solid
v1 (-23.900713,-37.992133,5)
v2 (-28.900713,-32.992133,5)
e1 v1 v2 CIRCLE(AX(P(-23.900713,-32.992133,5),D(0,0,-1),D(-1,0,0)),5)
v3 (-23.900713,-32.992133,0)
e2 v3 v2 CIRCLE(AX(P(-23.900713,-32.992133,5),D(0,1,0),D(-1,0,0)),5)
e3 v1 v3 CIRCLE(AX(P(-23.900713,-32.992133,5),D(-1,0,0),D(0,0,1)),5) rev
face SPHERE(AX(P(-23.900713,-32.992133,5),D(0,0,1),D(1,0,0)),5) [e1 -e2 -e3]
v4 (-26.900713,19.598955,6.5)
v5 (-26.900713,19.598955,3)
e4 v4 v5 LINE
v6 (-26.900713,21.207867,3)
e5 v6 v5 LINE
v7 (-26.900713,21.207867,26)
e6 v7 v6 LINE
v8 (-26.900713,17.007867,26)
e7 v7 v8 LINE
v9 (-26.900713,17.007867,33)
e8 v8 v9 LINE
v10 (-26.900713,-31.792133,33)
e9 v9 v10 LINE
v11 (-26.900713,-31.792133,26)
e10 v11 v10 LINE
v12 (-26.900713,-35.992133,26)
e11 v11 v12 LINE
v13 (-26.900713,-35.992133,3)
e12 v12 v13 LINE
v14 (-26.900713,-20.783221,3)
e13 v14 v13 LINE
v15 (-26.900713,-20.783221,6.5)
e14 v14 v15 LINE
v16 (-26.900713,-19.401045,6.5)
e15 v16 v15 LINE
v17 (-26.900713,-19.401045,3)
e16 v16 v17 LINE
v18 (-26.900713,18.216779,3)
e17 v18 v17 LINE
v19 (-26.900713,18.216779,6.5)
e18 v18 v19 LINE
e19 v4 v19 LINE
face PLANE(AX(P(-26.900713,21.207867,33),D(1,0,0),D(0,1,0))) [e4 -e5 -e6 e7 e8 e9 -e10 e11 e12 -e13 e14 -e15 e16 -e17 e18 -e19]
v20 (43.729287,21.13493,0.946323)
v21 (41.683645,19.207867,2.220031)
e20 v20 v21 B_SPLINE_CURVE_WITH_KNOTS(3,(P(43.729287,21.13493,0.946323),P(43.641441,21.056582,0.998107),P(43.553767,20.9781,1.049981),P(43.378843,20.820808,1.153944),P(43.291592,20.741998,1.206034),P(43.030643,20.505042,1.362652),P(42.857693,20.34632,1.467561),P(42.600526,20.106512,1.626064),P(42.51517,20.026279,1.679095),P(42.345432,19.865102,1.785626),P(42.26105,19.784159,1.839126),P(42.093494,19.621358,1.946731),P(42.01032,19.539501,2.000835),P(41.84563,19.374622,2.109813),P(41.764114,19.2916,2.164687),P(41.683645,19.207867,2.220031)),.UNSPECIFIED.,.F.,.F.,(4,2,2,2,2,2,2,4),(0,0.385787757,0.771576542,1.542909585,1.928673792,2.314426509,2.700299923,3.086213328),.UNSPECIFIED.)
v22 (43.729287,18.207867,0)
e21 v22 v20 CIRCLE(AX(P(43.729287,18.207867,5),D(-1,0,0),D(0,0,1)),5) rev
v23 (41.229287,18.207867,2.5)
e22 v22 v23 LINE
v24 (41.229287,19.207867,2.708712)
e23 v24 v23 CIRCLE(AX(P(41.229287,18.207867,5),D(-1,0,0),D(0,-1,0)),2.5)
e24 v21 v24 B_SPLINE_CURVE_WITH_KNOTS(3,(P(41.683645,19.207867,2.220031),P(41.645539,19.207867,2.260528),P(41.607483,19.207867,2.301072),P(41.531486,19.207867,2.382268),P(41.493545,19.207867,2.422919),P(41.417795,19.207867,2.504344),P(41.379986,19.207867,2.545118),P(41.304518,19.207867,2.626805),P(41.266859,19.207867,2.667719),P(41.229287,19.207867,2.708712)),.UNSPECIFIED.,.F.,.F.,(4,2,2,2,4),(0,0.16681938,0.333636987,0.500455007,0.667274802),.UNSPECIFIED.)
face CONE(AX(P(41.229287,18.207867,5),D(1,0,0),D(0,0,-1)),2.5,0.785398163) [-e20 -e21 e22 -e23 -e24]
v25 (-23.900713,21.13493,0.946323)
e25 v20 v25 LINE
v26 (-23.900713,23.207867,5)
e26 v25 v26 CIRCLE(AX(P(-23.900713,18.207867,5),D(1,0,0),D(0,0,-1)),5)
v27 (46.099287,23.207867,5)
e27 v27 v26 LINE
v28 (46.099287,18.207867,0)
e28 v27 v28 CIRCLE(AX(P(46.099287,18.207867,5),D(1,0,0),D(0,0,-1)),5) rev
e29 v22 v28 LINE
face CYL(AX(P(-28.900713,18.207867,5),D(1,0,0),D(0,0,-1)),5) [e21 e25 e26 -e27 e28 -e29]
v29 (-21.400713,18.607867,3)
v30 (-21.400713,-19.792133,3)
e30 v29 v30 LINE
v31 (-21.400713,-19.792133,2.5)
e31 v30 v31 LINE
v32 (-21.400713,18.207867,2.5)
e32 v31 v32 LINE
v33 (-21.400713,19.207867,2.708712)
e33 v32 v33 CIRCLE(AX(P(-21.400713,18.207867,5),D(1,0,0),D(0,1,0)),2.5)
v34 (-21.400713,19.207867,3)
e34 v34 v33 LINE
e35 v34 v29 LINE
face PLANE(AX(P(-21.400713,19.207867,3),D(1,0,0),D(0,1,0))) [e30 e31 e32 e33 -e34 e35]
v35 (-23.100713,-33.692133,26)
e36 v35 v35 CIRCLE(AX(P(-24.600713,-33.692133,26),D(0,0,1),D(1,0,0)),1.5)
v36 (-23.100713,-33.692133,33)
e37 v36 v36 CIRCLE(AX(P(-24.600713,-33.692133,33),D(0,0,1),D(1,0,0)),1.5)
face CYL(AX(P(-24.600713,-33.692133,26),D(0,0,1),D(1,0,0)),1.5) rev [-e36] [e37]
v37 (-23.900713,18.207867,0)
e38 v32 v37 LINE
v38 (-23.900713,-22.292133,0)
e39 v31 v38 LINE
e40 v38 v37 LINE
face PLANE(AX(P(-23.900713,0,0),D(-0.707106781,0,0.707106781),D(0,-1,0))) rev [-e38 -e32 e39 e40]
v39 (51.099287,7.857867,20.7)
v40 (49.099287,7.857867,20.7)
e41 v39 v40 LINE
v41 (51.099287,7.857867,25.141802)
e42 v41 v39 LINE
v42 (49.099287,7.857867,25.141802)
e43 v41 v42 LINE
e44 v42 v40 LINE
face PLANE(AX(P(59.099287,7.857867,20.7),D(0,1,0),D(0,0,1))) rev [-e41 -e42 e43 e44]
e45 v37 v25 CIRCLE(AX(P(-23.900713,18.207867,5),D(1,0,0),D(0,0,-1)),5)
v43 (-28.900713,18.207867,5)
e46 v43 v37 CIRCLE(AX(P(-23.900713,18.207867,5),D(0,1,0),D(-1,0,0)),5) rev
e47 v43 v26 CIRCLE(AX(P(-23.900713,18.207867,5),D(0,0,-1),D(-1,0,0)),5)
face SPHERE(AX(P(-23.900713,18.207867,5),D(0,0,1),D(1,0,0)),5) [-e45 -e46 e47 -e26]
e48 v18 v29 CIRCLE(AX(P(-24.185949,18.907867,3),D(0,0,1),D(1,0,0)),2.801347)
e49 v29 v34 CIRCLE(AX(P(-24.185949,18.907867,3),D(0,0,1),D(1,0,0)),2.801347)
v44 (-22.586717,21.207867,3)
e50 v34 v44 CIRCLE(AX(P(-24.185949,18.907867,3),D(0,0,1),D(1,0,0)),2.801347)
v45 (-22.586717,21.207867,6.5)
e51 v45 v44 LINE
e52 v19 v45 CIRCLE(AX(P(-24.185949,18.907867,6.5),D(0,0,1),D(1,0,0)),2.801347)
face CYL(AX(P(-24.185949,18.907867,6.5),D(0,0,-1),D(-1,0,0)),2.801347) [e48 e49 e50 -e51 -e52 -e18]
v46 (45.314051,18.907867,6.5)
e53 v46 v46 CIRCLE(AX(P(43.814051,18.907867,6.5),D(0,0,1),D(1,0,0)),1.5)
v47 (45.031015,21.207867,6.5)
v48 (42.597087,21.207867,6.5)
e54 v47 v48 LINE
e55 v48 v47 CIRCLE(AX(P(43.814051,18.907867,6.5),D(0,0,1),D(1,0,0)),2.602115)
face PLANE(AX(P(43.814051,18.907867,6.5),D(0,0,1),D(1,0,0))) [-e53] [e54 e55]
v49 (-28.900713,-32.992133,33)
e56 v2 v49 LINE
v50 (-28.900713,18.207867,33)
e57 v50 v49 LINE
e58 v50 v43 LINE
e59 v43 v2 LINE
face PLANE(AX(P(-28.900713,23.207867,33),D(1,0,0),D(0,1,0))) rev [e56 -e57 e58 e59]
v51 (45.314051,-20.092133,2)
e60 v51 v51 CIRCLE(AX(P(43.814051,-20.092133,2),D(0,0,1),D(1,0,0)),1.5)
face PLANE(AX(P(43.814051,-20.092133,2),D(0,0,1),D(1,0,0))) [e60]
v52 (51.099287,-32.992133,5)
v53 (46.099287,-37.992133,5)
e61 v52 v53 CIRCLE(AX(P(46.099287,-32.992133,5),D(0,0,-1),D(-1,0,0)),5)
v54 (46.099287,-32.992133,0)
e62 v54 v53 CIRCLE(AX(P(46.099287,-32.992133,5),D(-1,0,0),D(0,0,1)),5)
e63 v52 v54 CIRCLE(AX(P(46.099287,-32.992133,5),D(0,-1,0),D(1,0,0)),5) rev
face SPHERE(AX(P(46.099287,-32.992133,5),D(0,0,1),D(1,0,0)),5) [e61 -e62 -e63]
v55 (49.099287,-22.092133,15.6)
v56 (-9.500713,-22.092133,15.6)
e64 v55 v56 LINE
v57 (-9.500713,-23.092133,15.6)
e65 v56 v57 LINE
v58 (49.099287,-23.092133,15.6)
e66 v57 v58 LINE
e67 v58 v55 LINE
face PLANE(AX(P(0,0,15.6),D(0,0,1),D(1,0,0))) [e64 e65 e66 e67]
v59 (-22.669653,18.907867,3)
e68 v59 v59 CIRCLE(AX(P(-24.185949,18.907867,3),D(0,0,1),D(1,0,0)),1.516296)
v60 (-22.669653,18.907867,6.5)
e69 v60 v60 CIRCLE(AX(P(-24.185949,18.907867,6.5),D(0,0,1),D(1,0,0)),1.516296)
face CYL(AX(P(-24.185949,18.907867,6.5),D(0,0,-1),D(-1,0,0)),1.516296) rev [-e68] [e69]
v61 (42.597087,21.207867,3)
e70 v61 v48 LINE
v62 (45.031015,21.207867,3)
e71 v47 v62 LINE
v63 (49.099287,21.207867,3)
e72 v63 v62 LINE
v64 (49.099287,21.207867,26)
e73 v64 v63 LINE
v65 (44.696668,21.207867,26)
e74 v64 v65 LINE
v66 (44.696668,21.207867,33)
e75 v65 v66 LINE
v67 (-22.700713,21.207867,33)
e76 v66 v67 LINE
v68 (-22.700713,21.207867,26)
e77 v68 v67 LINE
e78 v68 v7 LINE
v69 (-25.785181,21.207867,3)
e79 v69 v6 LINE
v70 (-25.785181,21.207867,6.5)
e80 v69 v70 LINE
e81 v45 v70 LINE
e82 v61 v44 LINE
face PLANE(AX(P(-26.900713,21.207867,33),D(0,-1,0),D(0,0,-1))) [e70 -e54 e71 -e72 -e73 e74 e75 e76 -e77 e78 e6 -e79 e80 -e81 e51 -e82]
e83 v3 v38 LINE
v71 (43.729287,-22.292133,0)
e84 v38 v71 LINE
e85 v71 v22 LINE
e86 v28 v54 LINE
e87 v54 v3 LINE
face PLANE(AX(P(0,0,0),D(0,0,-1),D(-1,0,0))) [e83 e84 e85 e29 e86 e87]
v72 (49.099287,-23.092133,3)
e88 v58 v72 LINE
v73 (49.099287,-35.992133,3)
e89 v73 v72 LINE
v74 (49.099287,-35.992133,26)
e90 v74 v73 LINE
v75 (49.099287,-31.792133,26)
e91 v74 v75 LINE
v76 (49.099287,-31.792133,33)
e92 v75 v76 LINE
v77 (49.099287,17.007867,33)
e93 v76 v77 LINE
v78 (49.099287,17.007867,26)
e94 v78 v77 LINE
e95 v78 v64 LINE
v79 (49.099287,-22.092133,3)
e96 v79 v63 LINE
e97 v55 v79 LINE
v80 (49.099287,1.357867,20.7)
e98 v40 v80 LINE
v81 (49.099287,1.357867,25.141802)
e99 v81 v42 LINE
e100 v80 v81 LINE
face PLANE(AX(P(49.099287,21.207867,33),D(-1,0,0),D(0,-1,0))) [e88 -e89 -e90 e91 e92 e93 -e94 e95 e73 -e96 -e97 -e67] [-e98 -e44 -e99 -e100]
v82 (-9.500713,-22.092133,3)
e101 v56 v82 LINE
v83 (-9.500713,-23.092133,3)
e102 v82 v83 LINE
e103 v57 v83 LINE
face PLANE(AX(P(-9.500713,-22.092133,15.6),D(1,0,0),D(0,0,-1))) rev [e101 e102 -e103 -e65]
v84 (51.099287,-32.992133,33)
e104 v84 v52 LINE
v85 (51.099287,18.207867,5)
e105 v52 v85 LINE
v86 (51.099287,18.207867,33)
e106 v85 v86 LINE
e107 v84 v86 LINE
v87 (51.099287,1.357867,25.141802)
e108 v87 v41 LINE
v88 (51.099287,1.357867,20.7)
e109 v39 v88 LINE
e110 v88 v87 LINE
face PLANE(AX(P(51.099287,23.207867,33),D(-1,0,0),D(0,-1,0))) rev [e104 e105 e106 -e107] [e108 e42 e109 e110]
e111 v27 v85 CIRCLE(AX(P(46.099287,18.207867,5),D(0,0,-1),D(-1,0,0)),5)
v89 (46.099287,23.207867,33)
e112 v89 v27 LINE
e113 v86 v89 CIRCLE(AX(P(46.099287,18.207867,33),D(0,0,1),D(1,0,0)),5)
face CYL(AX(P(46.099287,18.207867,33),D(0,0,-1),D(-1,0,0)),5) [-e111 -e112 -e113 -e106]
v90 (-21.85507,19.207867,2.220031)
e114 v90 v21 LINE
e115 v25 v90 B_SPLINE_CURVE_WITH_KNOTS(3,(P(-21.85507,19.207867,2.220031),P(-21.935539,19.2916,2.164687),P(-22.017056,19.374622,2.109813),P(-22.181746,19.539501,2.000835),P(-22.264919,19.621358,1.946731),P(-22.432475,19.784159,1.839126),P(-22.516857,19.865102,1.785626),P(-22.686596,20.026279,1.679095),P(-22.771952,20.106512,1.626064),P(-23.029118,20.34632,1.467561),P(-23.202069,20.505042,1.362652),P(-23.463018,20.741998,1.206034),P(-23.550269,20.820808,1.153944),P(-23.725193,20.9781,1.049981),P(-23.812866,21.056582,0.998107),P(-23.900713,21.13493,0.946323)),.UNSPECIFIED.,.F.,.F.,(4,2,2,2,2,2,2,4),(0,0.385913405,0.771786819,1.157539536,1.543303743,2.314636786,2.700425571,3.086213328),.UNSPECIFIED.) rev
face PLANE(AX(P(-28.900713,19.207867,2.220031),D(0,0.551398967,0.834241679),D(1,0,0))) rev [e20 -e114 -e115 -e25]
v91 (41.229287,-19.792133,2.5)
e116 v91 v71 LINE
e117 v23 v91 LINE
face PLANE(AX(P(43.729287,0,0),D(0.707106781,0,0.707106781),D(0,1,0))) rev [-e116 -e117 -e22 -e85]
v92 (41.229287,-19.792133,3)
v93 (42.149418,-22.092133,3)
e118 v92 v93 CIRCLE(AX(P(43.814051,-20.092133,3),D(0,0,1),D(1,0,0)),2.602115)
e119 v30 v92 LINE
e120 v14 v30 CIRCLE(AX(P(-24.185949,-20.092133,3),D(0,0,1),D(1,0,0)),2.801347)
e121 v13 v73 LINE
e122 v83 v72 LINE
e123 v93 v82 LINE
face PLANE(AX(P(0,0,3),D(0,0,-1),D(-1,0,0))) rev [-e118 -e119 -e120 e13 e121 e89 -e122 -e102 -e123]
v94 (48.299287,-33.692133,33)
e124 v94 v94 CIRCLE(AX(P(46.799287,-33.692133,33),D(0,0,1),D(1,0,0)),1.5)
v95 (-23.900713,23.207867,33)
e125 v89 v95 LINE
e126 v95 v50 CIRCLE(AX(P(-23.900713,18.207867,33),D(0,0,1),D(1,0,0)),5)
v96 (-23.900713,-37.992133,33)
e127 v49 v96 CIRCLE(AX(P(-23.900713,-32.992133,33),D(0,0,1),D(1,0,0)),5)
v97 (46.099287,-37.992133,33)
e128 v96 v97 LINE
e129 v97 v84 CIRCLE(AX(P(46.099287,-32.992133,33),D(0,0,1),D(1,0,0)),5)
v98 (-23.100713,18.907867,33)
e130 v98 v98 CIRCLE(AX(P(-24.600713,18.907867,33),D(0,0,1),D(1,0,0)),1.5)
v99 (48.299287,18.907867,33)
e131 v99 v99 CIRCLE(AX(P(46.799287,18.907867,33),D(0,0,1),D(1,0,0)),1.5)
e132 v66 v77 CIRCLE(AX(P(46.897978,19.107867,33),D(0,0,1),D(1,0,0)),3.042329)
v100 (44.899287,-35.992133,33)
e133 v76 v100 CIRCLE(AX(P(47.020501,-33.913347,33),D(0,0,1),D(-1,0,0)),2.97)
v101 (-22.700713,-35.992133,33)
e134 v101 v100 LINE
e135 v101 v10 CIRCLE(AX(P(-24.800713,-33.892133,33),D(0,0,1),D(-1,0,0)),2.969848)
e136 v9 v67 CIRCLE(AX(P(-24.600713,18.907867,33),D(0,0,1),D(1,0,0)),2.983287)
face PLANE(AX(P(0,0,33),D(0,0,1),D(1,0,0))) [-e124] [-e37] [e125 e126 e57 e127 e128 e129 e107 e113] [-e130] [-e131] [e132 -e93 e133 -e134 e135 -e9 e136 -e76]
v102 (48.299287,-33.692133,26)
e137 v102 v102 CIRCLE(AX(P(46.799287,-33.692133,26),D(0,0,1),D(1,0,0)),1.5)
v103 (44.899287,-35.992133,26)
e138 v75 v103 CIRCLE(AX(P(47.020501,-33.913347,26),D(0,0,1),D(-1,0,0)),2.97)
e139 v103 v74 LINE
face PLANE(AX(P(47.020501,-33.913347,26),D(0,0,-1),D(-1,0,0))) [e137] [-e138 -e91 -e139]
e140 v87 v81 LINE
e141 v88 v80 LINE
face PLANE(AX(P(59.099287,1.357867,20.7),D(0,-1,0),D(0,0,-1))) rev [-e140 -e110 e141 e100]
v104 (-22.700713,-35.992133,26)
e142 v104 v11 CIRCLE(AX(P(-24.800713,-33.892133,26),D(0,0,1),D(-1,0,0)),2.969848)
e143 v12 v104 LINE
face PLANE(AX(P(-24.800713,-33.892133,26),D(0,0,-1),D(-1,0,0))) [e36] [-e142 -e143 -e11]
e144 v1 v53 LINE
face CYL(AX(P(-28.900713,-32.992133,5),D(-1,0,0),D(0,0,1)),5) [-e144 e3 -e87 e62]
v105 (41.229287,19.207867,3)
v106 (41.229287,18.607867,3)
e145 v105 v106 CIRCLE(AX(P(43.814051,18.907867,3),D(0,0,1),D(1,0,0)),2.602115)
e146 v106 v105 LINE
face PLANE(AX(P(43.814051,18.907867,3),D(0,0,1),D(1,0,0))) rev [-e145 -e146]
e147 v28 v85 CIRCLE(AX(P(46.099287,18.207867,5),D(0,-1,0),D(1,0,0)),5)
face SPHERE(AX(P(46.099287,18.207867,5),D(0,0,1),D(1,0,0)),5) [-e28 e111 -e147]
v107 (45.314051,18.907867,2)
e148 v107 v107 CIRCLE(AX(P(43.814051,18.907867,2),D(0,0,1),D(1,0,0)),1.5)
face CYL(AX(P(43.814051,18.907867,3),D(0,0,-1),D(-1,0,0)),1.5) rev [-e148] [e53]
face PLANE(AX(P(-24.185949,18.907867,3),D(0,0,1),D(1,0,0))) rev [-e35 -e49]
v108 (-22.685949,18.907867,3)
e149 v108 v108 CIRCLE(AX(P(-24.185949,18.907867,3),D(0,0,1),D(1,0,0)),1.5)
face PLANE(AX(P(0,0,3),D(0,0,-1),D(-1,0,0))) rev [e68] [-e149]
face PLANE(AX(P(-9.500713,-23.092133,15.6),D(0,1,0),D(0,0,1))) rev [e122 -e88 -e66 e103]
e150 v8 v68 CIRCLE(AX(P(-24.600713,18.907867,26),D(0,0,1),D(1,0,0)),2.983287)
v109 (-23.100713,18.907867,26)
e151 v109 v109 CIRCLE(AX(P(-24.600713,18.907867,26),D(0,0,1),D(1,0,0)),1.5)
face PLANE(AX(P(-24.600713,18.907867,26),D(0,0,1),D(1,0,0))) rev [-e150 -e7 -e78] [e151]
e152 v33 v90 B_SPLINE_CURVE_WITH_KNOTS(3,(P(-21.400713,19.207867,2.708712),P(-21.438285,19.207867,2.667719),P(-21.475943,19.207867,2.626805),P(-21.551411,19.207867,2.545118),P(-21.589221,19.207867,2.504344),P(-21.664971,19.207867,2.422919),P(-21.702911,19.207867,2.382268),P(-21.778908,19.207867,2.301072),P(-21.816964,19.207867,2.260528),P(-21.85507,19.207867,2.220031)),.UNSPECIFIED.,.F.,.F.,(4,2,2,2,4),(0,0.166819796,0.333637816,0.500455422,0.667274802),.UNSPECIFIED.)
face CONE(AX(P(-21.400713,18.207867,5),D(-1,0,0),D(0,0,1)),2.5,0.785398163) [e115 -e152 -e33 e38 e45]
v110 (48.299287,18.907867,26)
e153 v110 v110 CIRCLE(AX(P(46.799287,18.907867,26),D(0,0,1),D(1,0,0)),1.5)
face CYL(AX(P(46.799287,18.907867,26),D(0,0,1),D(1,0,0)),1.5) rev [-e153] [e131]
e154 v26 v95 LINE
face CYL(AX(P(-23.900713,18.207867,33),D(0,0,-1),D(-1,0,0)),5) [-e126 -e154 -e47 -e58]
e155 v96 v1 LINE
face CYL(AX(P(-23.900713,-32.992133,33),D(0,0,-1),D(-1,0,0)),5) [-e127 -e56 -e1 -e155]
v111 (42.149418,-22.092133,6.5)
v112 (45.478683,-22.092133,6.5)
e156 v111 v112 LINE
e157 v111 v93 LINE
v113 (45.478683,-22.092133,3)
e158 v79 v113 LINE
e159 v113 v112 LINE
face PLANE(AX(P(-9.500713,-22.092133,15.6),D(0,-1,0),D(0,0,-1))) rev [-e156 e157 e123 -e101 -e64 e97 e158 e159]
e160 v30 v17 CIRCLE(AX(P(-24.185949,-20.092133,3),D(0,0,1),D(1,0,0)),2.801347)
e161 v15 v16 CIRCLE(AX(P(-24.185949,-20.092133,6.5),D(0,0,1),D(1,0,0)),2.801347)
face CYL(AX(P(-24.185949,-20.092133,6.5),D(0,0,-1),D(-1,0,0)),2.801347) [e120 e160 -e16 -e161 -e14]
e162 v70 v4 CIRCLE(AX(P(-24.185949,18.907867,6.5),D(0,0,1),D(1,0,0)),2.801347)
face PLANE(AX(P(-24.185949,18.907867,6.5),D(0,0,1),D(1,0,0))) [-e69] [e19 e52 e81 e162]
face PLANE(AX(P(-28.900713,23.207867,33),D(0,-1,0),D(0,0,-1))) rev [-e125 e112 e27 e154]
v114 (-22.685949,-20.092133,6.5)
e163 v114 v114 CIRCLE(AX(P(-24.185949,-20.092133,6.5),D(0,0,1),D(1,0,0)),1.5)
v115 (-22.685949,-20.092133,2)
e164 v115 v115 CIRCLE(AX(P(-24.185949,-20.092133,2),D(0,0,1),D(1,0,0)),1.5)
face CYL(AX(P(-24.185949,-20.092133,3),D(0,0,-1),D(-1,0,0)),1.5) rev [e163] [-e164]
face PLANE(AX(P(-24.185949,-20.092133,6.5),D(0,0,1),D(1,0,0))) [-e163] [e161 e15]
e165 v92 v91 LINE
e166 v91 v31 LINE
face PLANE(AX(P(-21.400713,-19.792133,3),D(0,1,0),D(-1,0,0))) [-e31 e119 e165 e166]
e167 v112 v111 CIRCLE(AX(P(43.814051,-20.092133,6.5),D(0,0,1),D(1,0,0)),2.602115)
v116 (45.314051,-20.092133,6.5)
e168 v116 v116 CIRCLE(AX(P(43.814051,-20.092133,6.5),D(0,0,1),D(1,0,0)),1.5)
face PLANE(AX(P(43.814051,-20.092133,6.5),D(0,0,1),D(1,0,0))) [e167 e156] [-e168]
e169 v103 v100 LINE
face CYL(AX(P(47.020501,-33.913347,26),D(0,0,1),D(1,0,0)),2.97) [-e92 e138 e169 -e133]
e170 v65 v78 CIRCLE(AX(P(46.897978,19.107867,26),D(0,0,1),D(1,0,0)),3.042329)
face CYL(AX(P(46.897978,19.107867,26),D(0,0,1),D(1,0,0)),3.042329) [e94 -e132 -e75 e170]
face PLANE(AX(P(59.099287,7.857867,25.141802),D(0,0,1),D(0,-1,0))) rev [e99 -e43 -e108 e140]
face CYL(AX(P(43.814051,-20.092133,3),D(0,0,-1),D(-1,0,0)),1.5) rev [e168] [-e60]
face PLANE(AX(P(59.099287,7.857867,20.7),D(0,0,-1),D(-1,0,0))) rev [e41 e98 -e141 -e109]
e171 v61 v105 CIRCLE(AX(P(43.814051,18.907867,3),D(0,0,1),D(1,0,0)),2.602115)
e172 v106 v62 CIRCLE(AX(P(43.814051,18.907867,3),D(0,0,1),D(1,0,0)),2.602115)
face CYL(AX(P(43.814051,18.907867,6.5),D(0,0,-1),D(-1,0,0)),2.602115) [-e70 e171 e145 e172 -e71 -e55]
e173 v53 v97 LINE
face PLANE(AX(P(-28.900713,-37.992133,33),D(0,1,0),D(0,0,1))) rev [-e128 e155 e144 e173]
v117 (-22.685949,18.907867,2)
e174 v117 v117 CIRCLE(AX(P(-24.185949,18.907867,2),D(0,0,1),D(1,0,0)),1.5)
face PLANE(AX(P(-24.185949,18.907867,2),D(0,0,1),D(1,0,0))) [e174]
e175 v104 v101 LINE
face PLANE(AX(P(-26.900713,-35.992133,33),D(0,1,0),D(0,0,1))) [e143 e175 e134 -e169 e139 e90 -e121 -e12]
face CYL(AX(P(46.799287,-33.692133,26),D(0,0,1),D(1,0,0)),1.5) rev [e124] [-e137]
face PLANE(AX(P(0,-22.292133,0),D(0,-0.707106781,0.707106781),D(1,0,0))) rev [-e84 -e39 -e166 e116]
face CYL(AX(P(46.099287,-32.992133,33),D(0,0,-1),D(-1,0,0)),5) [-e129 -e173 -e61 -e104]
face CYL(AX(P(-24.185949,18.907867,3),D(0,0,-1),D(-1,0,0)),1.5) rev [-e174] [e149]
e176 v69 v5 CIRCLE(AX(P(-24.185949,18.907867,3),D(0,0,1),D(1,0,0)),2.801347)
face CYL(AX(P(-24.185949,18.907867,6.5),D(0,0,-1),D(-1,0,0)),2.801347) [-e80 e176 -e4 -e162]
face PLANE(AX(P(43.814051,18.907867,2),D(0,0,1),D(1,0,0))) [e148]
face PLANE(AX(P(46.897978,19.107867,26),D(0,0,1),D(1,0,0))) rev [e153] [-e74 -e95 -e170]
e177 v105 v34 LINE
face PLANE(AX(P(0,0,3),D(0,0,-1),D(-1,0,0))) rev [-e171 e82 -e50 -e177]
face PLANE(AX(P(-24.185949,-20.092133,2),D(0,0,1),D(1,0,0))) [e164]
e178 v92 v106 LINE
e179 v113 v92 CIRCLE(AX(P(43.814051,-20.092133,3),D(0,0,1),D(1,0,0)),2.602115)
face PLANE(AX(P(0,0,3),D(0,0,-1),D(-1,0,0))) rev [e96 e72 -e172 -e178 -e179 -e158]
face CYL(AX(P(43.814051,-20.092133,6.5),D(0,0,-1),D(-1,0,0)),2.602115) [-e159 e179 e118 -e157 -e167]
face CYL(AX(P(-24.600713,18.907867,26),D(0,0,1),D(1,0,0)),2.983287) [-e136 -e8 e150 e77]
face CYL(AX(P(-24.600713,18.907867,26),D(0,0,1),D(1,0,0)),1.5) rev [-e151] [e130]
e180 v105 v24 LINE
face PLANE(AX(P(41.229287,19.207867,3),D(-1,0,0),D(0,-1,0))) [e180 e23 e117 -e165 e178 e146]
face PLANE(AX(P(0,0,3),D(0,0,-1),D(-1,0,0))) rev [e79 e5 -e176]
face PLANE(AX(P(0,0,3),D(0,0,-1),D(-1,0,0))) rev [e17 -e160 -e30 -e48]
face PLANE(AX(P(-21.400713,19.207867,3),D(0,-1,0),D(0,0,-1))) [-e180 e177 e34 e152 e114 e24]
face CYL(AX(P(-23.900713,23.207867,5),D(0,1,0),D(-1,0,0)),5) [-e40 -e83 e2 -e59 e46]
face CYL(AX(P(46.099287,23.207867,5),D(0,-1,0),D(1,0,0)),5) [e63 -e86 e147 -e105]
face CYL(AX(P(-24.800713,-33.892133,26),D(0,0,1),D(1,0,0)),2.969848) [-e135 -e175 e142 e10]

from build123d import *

# Parameters (mm, degrees)
ESQUISSE1_W             = 76.9
ESQUISSE1_H             = 57.2
ESQUISSE1_R             = 1.5
ESQUISSE1_W_2           = 62.63
ESQUISSE1_H_2           = 39
BOSS_EXTRU_1_DEPTH      = 3
ESQUISSE2_W             = 3.5
ESQUISSE2_H             = 43.3
BOSS_EXTRU_2_DEPTH      = 3
ESQUISSE3_W             = 80
ESQUISSE3_H             = 61.2
ESQUISSE3_W_2           = 76
ESQUISSE3_H_2           = 57.2
BOSS_EXTRU_3_DEPTH      = 33
ESQUISSE4_R             = 2.80134662
ESQUISSE4_R_2           = 1.516296111
ESQUISSE4_R_3           = 1.5
ESQUISSE4_R_4           = 2.602114883
BOSS_EXTRU_4_DEPTH      = 3.5
ESQUISSE5_R             = 1.5
BOSS_EXTRU_5_DEPTH      = 2
CONG_2_R                = 5
CONG_3_R                = 5
ESQUISSE6_W             = 4.441802337
ESQUISSE6_H             = 6.5
ENL_V_MAT_EXTRU_1_DEPTH = 10
ESQUISSE8_R             = 1.5
BOSS_EXTRU_7_DEPTH      = 7
CHANFREIN1_SIZE         = 2.5
CHANFREIN1_SIZE_2       = 2.11901059
ESQUISSE10_W            = 58.6
ESQUISSE10_H            = 1
BOSS_EXTRU_8_DEPTH      = 12.6


with BuildPart() as part:
    # Esquisse1 → Boss.-Extru.1 (new body)
    with BuildSketch(Plane.XY):
        with Locations((11.549287317, -7.392133332)):
            Rectangle(ESQUISSE1_W, ESQUISSE1_H)
        with Locations((-24.185949278, 18.907866668)):
            Circle(ESQUISSE1_R, mode=Mode.SUBTRACT)
        with Locations((43.814050722, 18.907866668)):
            Circle(ESQUISSE1_R, mode=Mode.SUBTRACT)
        with Locations((-24.185949278, -20.092133332)):
            Circle(ESQUISSE1_R, mode=Mode.SUBTRACT)
        with Locations((43.814050722, -20.092133332)):
            Circle(ESQUISSE1_R, mode=Mode.SUBTRACT)
        with Locations((9.914287317, -0.292133332)):
            Rectangle(ESQUISSE1_W_2, ESQUISSE1_H_2, mode=Mode.SUBTRACT)
    extrude(amount=BOSS_EXTRU_1_DEPTH)

    # Esquisse2 → Boss.-Extru.2 (add)
    with BuildSketch(Plane.XY):
        with Locations((47.349287317, -0.442133332)):
            Rectangle(ESQUISSE2_W, ESQUISSE2_H)
    extrude(amount=BOSS_EXTRU_2_DEPTH)

    # Esquisse3 → Boss.-Extru.3 (add)
    with BuildSketch(Plane.XY):
        with Locations((11.099287317, -7.392133332)):
            Rectangle(ESQUISSE3_W, ESQUISSE3_H)
        with Locations((11.099287317, -7.392133332)):
            Rectangle(ESQUISSE3_W_2, ESQUISSE3_H_2, mode=Mode.SUBTRACT)
    extrude(amount=BOSS_EXTRU_3_DEPTH)

    # Esquisse4 → Boss.-Extru.4 (add)
    # profile 1 of 4: a face of its own
    with BuildSketch(Plane.XY.offset(3)):
        with Locations((-24.185949278, 18.907866668)):
            Circle(ESQUISSE4_R)
        with Locations((-24.185949278, 18.907866668)):
            Circle(ESQUISSE4_R_2, mode=Mode.SUBTRACT)
    # profile 2 of 4: a face of its own
    with BuildSketch(Plane.XY.offset(3)):
        with Locations((-24.185949278, -20.092133332)):
            Circle(ESQUISSE4_R)
        with Locations((-24.185949278, -20.092133332)):
            Circle(ESQUISSE4_R_3, mode=Mode.SUBTRACT)
    # profile 3 of 4: a face of its own
    with BuildSketch(Plane.XY.offset(3)):
        with Locations(Location((43.814050722, -20.092133332, 0), (0, 0, 173.379599702))):
            Circle(ESQUISSE4_R_4)
        with Locations((43.814050722, -20.092133332)):
            Circle(ESQUISSE4_R_3, mode=Mode.SUBTRACT)
    # profile 4 of 4: a face of its own
    with BuildSketch(Plane.XY.offset(3)):
        with Locations((43.814050722, 18.907866668)):
            Circle(ESQUISSE4_R_4)
        with Locations((43.814050722, 18.907866668)):
            Circle(ESQUISSE4_R_3, mode=Mode.SUBTRACT)
    extrude(amount=BOSS_EXTRU_4_DEPTH)

    # Esquisse5 → Boss.-Extru.5 (add)
    with BuildSketch(Plane.XY):
        with Locations((-24.185949278, 18.907866668)):
            Circle(ESQUISSE5_R)
        with Locations((-24.185949278, -20.092133332)):
            Circle(ESQUISSE5_R)
        with Locations((43.814050722, 18.907866668)):
            Circle(ESQUISSE5_R)
        with Locations((43.814050722, -20.092133332)):
            Circle(ESQUISSE5_R)
    extrude(amount=BOSS_EXTRU_5_DEPTH)

    # Congé2
    # the kernel refuses this fillet: 5 mm, written as the material it takes off along each edge
    with BuildSketch(Plane(origin=(-28.900712683, -50.492133332, 0), x_dir=(1, 0, 0), z_dir=(0, 1, 0)), Plane(origin=(51.099287317, 35.707866668, 0), x_dir=(-1, 0, 0), z_dir=(0, -1, 0))) as cong_2_piece_1:
        with BuildLine():
            CenterArc((CONG_2_R, -CONG_2_R), CONG_2_R, 90, 90)
            Line((0, -CONG_2_R), (0, 0))
            Line((0, 0), (CONG_2_R, 0))
        make_face()
    extrude(amount=86.2, mode=Mode.SUBTRACT)
    with BuildSketch(Plane(origin=(63.599287317, -37.992133332, 0), x_dir=(0, 1, 0), z_dir=(-1, 0, 0)), Plane(origin=(-41.400712683, 23.207866668, 0), x_dir=(0, -1, 0), z_dir=(1, 0, 0))) as cong_2_piece_2:
        with BuildLine():
            CenterArc((CONG_2_R, -CONG_2_R), CONG_2_R, 90, 90)
            Line((0, -CONG_2_R), (0, 0))
            Line((0, 0), (CONG_2_R, 0))
        make_face()
    extrude(amount=105, mode=Mode.SUBTRACT)

    # Congé3
    # the kernel refuses this fillet: 5 mm, written as the material it takes off along each edge
    with BuildSketch(Plane(origin=(46.099287317, 18.207866668, 5), x_dir=(1, 0, 0), z_dir=(0, 1, 0))) as cong_3_piece_1_section:
        Polygon((0, 0), (CONG_3_R, 0), (CONG_3_R, CONG_3_R), (0, CONG_3_R), align=None)
    cong_3_piece_1 = extrude(amount=CONG_3_R, mode=Mode.PRIVATE)
    cong_3_piece_1 = cong_3_piece_1 - Plane(origin=(46.099287317, 18.207866668, 5), x_dir=(-0.7071067811865475, 0, 0.7071067811865475), z_dir=(0, 1, 0)) * Sphere(CONG_3_R, mode=Mode.PRIVATE)
    add(cong_3_piece_1, mode=Mode.SUBTRACT)
    with BuildSketch(Plane(origin=(46.099287317, -32.992133332, 5), x_dir=(0, -1, 0), z_dir=(1, 0, 0))) as cong_3_piece_2_section:
        Polygon((0, 0), (CONG_3_R, 0), (CONG_3_R, CONG_3_R), (0, CONG_3_R), align=None)
    cong_3_piece_2 = extrude(amount=CONG_3_R, mode=Mode.PRIVATE)
    cong_3_piece_2 = cong_3_piece_2 - Plane(origin=(46.099287317, -32.992133332, 5), x_dir=(0, 0.7071067811865475, 0.7071067811865475), z_dir=(1, 0, 0)) * Sphere(CONG_3_R, mode=Mode.PRIVATE)
    add(cong_3_piece_2, mode=Mode.SUBTRACT)
    with BuildSketch(Plane(origin=(-23.900712683, 18.207866668, 5), x_dir=(-1, 0, 0), z_dir=(0, 1, 0))) as cong_3_piece_3_section:
        Polygon((0, 0), (CONG_3_R, 0), (CONG_3_R, -CONG_3_R), (0, -CONG_3_R), align=None)
    cong_3_piece_3 = extrude(amount=CONG_3_R, mode=Mode.PRIVATE)
    cong_3_piece_3 = cong_3_piece_3 - Plane(origin=(-23.900712683, 18.207866668, 5), x_dir=(0.7071067811865475, 0, 0.7071067811865475), z_dir=(0, 1, 0)) * Sphere(CONG_3_R, mode=Mode.PRIVATE)
    add(cong_3_piece_3, mode=Mode.SUBTRACT)
    with BuildSketch(Plane(origin=(-23.900712683, -32.992133332, 5), x_dir=(-1, 0, 0), z_dir=(0, -1, 0))) as cong_3_piece_4_section:
        Polygon((0, 0), (CONG_3_R, 0), (CONG_3_R, CONG_3_R), (0, CONG_3_R), align=None)
    cong_3_piece_4 = extrude(amount=CONG_3_R, mode=Mode.PRIVATE)
    cong_3_piece_4 = cong_3_piece_4 - Plane(origin=(-23.900712683, -32.992133332, 5), x_dir=(0.7071067811865475, 0, 0.7071067811865475), z_dir=(0, -1, 0)) * Sphere(CONG_3_R, mode=Mode.PRIVATE)
    add(cong_3_piece_4, mode=Mode.SUBTRACT)
    with BuildSketch(Plane(origin=(-28.900712683, 23.207866668, 5), x_dir=(1, 0, 0), z_dir=(0, 0, 1))) as cong_3_piece_5:
        with BuildLine():
            CenterArc((CONG_3_R, -CONG_3_R), CONG_3_R, 90, 90)
            Line((0, -CONG_3_R), (0, 0))
            Line((0, 0), (CONG_3_R, 0))
        make_face()
    extrude(amount=40.5, mode=Mode.SUBTRACT)
    with BuildSketch(Plane(origin=(-28.900712683, -37.992133332, 5), x_dir=(1, 0, 0), z_dir=(0, 0, 1)), Plane(origin=(51.099287317, -37.992133332, 5), x_dir=(0, 1, 0), z_dir=(0, 0, 1)), Plane(origin=(51.099287317, 23.207866668, 5), x_dir=(-1, 0, 0), z_dir=(0, 0, 1))) as cong_3_piece_6:
        with BuildLine():
            CenterArc((CONG_3_R, CONG_3_R), CONG_3_R, 180, 90)
            Line((0, CONG_3_R), (0, 0))
            Line((0, 0), (CONG_3_R, 0))
        make_face()
    extrude(amount=40.5, mode=Mode.SUBTRACT)

    # Esquisse6 → Enlèv. mat.-Extru.1 (cut)
    with BuildSketch(Plane.ZY.offset(-49.099287317)):
        with Locations((22.920901169, 4.607866668)):
            Rectangle(ESQUISSE6_W, ESQUISSE6_H)
    extrude(amount=-ENL_V_MAT_EXTRU_1_DEPTH, mode=Mode.SUBTRACT)

    # Esquisse8 → Boss.-Extru.7 (add)
    # profile 1 of 4: a face of its own
    with BuildSketch(Plane.XY.offset(33)):
        with BuildLine():
            Line((-26.900712683, 21.207866668), (-26.900712683, 17.007866668))
            ThreePointArc((-26.900712683, 17.007866668), (-22.491210372, 16.798364357), (-22.700712683, 21.207866668))
            Line((-22.700712683, 21.207866668), (-26.900712683, 21.207866668))
        make_face()
        with Locations((-24.600712683, 18.907866668)):
            Circle(ESQUISSE8_R, mode=Mode.SUBTRACT)
    # profile 2 of 4: a face of its own
    with BuildSketch(Plane.XY.offset(33)):
        with BuildLine():
            Line((49.099287317, 17.007866668), (49.099287317, 21.207866668))
            Line((49.099287317, 21.207866668), (44.696667897, 21.207866668))
            ThreePointArc((44.696667897, 21.207866668), (44.797977607, 16.906556958), (49.099287317, 17.007866668))
        make_face()
        with Locations((46.799287317, 18.907866668)):
            Circle(ESQUISSE8_R, mode=Mode.SUBTRACT)
    # profile 3 of 4: a face of its own
    with BuildSketch(Plane.XY.offset(33)):
        with BuildLine():
            Line((-26.900712683, -35.992133332), (-22.700712683, -35.992133332))
            ThreePointArc((-22.700712683, -35.992133332), (-22.700712683, -31.792133332), (-26.900712683, -31.792133332))
            Line((-26.900712683, -31.792133332), (-26.900712683, -35.992133332))
        make_face()
        with Locations((-24.600712683, -33.692133332)):
            Circle(ESQUISSE8_R, mode=Mode.SUBTRACT)
    # profile 4 of 4: a face of its own
    with BuildSketch(Plane.XY.offset(33)):
        with BuildLine():
            Line((49.099287317, -35.992133332), (49.099287317, -31.792133332))
            ThreePointArc((49.099287317, -31.792133332), (44.92039338, -31.813239396), (44.899287317, -35.992133332))
            Line((44.899287317, -35.992133332), (49.099287317, -35.992133332))
        make_face()
        with Locations((46.799287317, -33.692133332)):
            Circle(ESQUISSE8_R, mode=Mode.SUBTRACT)
    extrude(amount=-BOSS_EXTRU_7_DEPTH)

    # Chanfrein1
    # the kernel refuses this chamfer: 2.5, 2.11901059 mm, written as the material it takes off along each edge
    with BuildSketch(Plane(origin=(-21.400712683, -19.792133332, 0), x_dir=(-1, 0, 0), z_dir=(0, 1, 0)), Plane(origin=(41.229287317, 18.207866668, 0), x_dir=(1, 0, 0), z_dir=(0, -1, 0))) as chanfrein1_piece_1:
        Polygon((CHANFREIN1_SIZE, 0), (0, CHANFREIN1_SIZE), (0, 0), align=None)
    extrude(amount=38, mode=Mode.SUBTRACT)
    with BuildSketch(Plane(origin=(-21.400712683, 18.207866668, 5), x_dir=(0, 0.9965085211042171, -0.08349112148418099), z_dir=(0, 0.08349112148418099, 0.9965085211042171))) as chanfrein1_piece_2_section:
        Polygon((5, CHANFREIN1_SIZE), (5 - CHANFREIN1_SIZE, 0), (5, 0), align=None)
    chanfrein1_piece_2 = revolve(axis=Axis((-21.400712683, 18.207866668, 5), (-1, 0, 0)), revolution_arc=85.210735942, mode=Mode.PRIVATE)
    chanfrein1_piece_2 = split(chanfrein1_piece_2, bisect_by=Plane(origin=(-21.400712683, 19.207866668, 5), z_dir=(0, -1, 0)), keep=Keep.TOP, mode=Mode.PRIVATE)
    add(chanfrein1_piece_2, mode=Mode.SUBTRACT)
    with BuildSketch(Plane(origin=(41.229287317, 18.207866668, 5), x_dir=(0, 0.9965085211042173, -0.08349112148417923), z_dir=(0, 0.08349112148417923, 0.9965085211042173))) as chanfrein1_piece_3_section:
        Polygon((5, -CHANFREIN1_SIZE), (5 - CHANFREIN1_SIZE, 0), (5, 0), align=None)
    chanfrein1_piece_3 = revolve(axis=Axis((41.229287317, 18.207866668, 5), (-1, 0, 0)), revolution_arc=85.210735942, mode=Mode.PRIVATE)
    chanfrein1_piece_3 = split(chanfrein1_piece_3, bisect_by=Plane(origin=(41.229287317, 19.207866668, 5), z_dir=(0, -1, 0)), keep=Keep.TOP, mode=Mode.PRIVATE)
    add(chanfrein1_piece_3, mode=Mode.SUBTRACT)
    with BuildSketch(Plane(origin=(41.229287317, -19.792133332, 0), x_dir=(0, -1, 0), z_dir=(-1, 0, 0))) as chanfrein1_piece_4:
        Polygon((CHANFREIN1_SIZE, 0), (0, CHANFREIN1_SIZE), (0, 0), align=None)
    extrude(amount=62.63, mode=Mode.SUBTRACT)
    with BuildSketch(Plane(origin=(41.229287317, 19.207866668, 0.101020514), x_dir=(0, 0.9157709220432261, 0.40170090657116964), z_dir=(-1, 0, 0))) as chanfrein1_piece_5:
        with BuildLine():
            Line((2.104307157, 0), (CHANFREIN1_SIZE_2 * 0.401700906568, -CHANFREIN1_SIZE_2 * 0.915770922035))
            Line((CHANFREIN1_SIZE_2 * 0.401700906568, -CHANFREIN1_SIZE_2 * 0.915770922035), (0, 0))
            ThreePointArc((0, 0), (1.079661864, 0.111880462), (2.104307157, 0))
        make_face()
    extrude(amount=62.63, mode=Mode.SUBTRACT)
    with BuildSketch(Plane(origin=(-21.400712683, -26.221340802, 0), x_dir=(-1, 0, 0), z_dir=(0, 1, 0))) as chanfrein1_piece_6a_section:
        Polygon((CHANFREIN1_SIZE, 0), (0, CHANFREIN1_SIZE), (0, 0), align=None)
    chanfrein1_piece_6a = extrude(amount=44.42920747, mode=Mode.PRIVATE)
    chanfrein1_piece_6a = split(chanfrein1_piece_6a, bisect_by=Plane(origin=(-21.400712683, -19.792133332, 0), z_dir=(0, -1, 0)), keep=Keep.TOP, mode=Mode.PRIVATE)
    with BuildSketch(Plane(origin=(41.229287317, -19.792133332, 0), x_dir=(0, -1, 0), z_dir=(-1, 0, 0))) as chanfrein1_piece_6b_section:
        Polygon((CHANFREIN1_SIZE, 0), (0, CHANFREIN1_SIZE), (0, 0), align=None)
    chanfrein1_piece_6b = extrude(amount=69.05920747, mode=Mode.PRIVATE)
    chanfrein1_piece_6b = split(chanfrein1_piece_6b, bisect_by=Plane(origin=(-21.400712683, -19.792133332, 0), z_dir=(-1, 0, 0)), keep=Keep.TOP, mode=Mode.PRIVATE)
    chanfrein1_piece_6 = chanfrein1_piece_6a & chanfrein1_piece_6b
    add(chanfrein1_piece_6, mode=Mode.SUBTRACT)
    with BuildSketch(Plane(origin=(41.229287317, 19.207866668, 0.101020514), x_dir=(0, 0.9157709220432261, 0.40170090657116964), z_dir=(-1, 0, 0))) as chanfrein1_piece_7a_section:
        with BuildLine():
            Line((2.104307157, 0), (CHANFREIN1_SIZE_2 * 0.401700906568, -CHANFREIN1_SIZE_2 * 0.915770922035))
            Line((CHANFREIN1_SIZE_2 * 0.401700906568, -CHANFREIN1_SIZE_2 * 0.915770922035), (0, 0))
            ThreePointArc((0, 0), (1.079661864, 0.111880462), (2.104307157, 0))
        make_face()
    chanfrein1_piece_7a = extrude(amount=68.069376073, mode=Mode.PRIVATE)
    chanfrein1_piece_7a = split(chanfrein1_piece_7a, bisect_by=Plane(origin=(-21.400712683, 19.207866668, 0.101020514), z_dir=(-1, 0, 0)), keep=Keep.TOP, mode=Mode.PRIVATE)
    with BuildSketch(Plane(origin=(-21.400712683, 18.207866668, 5), x_dir=(0, 0.9965085211042171, -0.08349112148418099), z_dir=(0, 0.08349112148418099, 0.9965085211042171))) as chanfrein1_piece_7b_section:
        Polygon((5, CHANFREIN1_SIZE), (5 - CHANFREIN1_SIZE, 0), (5, 0), align=None)
    chanfrein1_piece_7b = revolve(axis=Axis((-21.400712683, 18.207866668, 5), (-1, 0, 0)), revolution_arc=85.210735942, mode=Mode.PRIVATE)
    chanfrein1_piece_7b = split(chanfrein1_piece_7b, bisect_by=Plane(origin=(-21.400712683, 19.207866668, 5), z_dir=(0, 1, 0)), keep=Keep.TOP, mode=Mode.PRIVATE)
    chanfrein1_piece_7 = chanfrein1_piece_7a & chanfrein1_piece_7b
    add(chanfrein1_piece_7, mode=Mode.SUBTRACT)
    with BuildSketch(Plane(origin=(41.229287317, 18.207866668, 5), x_dir=(0, 0.9965085211042173, -0.08349112148417923), z_dir=(0, 0.08349112148417923, 0.9965085211042173))) as chanfrein1_piece_8a_section:
        Polygon((5, -CHANFREIN1_SIZE), (5 - CHANFREIN1_SIZE, 0), (5, 0), align=None)
    chanfrein1_piece_8a = revolve(axis=Axis((41.229287317, 18.207866668, 5), (-1, 0, 0)), revolution_arc=85.210735942, mode=Mode.PRIVATE)
    chanfrein1_piece_8a = split(chanfrein1_piece_8a, bisect_by=Plane(origin=(41.229287317, 19.207866668, 5), z_dir=(0, 1, 0)), keep=Keep.TOP, mode=Mode.PRIVATE)
    with BuildSketch(Plane(origin=(46.66866339, 19.207866668, 0.101020514), x_dir=(0, 0.9157709220432261, 0.40170090657116964), z_dir=(-1, 0, 0))) as chanfrein1_piece_8b_section:
        with BuildLine():
            Line((2.104307157, 0), (CHANFREIN1_SIZE_2 * 0.401700906568, -CHANFREIN1_SIZE_2 * 0.915770922035))
            Line((CHANFREIN1_SIZE_2 * 0.401700906568, -CHANFREIN1_SIZE_2 * 0.915770922035), (0, 0))
            ThreePointArc((0, 0), (1.079661864, 0.111880462), (2.104307157, 0))
        make_face()
    chanfrein1_piece_8b = extrude(amount=68.069376073, mode=Mode.PRIVATE)
    chanfrein1_piece_8b = split(chanfrein1_piece_8b, bisect_by=Plane(origin=(41.229287317, 19.207866668, 0.101020514), z_dir=(1, 0, 0)), keep=Keep.TOP, mode=Mode.PRIVATE)
    chanfrein1_piece_8 = chanfrein1_piece_8a & chanfrein1_piece_8b
    add(chanfrein1_piece_8, mode=Mode.SUBTRACT)
    with BuildSketch(Plane(origin=(47.658494787, -19.792133332, 0), x_dir=(0, -1, 0), z_dir=(-1, 0, 0))) as chanfrein1_piece_9a_section:
        Polygon((CHANFREIN1_SIZE, 0), (0, CHANFREIN1_SIZE), (0, 0), align=None)
    chanfrein1_piece_9a = extrude(amount=69.05920747, mode=Mode.PRIVATE)
    chanfrein1_piece_9a = split(chanfrein1_piece_9a, bisect_by=Plane(origin=(41.229287317, -19.792133332, 0), z_dir=(1, 0, 0)), keep=Keep.TOP, mode=Mode.PRIVATE)
    with BuildSketch(Plane(origin=(41.229287317, 18.207866668, 0), x_dir=(1, 0, 0), z_dir=(0, -1, 0))) as chanfrein1_piece_9b_section:
        Polygon((CHANFREIN1_SIZE, 0), (0, CHANFREIN1_SIZE), (0, 0), align=None)
    chanfrein1_piece_9b = extrude(amount=44.42920747, mode=Mode.PRIVATE)
    chanfrein1_piece_9b = split(chanfrein1_piece_9b, bisect_by=Plane(origin=(41.229287317, -19.792133332, 0), z_dir=(0, -1, 0)), keep=Keep.TOP, mode=Mode.PRIVATE)
    chanfrein1_piece_9 = chanfrein1_piece_9a & chanfrein1_piece_9b
    add(chanfrein1_piece_9, mode=Mode.SUBTRACT)

    # Esquisse10 → Boss.-Extru.8 (add)
    with BuildSketch(Plane.XY.offset(3)):
        with Locations((19.799287317, -22.592133332)):
            Rectangle(ESQUISSE10_W, ESQUISSE10_H)
    extrude(amount=BOSS_EXTRU_8_DEPTH)


solid = part.part
